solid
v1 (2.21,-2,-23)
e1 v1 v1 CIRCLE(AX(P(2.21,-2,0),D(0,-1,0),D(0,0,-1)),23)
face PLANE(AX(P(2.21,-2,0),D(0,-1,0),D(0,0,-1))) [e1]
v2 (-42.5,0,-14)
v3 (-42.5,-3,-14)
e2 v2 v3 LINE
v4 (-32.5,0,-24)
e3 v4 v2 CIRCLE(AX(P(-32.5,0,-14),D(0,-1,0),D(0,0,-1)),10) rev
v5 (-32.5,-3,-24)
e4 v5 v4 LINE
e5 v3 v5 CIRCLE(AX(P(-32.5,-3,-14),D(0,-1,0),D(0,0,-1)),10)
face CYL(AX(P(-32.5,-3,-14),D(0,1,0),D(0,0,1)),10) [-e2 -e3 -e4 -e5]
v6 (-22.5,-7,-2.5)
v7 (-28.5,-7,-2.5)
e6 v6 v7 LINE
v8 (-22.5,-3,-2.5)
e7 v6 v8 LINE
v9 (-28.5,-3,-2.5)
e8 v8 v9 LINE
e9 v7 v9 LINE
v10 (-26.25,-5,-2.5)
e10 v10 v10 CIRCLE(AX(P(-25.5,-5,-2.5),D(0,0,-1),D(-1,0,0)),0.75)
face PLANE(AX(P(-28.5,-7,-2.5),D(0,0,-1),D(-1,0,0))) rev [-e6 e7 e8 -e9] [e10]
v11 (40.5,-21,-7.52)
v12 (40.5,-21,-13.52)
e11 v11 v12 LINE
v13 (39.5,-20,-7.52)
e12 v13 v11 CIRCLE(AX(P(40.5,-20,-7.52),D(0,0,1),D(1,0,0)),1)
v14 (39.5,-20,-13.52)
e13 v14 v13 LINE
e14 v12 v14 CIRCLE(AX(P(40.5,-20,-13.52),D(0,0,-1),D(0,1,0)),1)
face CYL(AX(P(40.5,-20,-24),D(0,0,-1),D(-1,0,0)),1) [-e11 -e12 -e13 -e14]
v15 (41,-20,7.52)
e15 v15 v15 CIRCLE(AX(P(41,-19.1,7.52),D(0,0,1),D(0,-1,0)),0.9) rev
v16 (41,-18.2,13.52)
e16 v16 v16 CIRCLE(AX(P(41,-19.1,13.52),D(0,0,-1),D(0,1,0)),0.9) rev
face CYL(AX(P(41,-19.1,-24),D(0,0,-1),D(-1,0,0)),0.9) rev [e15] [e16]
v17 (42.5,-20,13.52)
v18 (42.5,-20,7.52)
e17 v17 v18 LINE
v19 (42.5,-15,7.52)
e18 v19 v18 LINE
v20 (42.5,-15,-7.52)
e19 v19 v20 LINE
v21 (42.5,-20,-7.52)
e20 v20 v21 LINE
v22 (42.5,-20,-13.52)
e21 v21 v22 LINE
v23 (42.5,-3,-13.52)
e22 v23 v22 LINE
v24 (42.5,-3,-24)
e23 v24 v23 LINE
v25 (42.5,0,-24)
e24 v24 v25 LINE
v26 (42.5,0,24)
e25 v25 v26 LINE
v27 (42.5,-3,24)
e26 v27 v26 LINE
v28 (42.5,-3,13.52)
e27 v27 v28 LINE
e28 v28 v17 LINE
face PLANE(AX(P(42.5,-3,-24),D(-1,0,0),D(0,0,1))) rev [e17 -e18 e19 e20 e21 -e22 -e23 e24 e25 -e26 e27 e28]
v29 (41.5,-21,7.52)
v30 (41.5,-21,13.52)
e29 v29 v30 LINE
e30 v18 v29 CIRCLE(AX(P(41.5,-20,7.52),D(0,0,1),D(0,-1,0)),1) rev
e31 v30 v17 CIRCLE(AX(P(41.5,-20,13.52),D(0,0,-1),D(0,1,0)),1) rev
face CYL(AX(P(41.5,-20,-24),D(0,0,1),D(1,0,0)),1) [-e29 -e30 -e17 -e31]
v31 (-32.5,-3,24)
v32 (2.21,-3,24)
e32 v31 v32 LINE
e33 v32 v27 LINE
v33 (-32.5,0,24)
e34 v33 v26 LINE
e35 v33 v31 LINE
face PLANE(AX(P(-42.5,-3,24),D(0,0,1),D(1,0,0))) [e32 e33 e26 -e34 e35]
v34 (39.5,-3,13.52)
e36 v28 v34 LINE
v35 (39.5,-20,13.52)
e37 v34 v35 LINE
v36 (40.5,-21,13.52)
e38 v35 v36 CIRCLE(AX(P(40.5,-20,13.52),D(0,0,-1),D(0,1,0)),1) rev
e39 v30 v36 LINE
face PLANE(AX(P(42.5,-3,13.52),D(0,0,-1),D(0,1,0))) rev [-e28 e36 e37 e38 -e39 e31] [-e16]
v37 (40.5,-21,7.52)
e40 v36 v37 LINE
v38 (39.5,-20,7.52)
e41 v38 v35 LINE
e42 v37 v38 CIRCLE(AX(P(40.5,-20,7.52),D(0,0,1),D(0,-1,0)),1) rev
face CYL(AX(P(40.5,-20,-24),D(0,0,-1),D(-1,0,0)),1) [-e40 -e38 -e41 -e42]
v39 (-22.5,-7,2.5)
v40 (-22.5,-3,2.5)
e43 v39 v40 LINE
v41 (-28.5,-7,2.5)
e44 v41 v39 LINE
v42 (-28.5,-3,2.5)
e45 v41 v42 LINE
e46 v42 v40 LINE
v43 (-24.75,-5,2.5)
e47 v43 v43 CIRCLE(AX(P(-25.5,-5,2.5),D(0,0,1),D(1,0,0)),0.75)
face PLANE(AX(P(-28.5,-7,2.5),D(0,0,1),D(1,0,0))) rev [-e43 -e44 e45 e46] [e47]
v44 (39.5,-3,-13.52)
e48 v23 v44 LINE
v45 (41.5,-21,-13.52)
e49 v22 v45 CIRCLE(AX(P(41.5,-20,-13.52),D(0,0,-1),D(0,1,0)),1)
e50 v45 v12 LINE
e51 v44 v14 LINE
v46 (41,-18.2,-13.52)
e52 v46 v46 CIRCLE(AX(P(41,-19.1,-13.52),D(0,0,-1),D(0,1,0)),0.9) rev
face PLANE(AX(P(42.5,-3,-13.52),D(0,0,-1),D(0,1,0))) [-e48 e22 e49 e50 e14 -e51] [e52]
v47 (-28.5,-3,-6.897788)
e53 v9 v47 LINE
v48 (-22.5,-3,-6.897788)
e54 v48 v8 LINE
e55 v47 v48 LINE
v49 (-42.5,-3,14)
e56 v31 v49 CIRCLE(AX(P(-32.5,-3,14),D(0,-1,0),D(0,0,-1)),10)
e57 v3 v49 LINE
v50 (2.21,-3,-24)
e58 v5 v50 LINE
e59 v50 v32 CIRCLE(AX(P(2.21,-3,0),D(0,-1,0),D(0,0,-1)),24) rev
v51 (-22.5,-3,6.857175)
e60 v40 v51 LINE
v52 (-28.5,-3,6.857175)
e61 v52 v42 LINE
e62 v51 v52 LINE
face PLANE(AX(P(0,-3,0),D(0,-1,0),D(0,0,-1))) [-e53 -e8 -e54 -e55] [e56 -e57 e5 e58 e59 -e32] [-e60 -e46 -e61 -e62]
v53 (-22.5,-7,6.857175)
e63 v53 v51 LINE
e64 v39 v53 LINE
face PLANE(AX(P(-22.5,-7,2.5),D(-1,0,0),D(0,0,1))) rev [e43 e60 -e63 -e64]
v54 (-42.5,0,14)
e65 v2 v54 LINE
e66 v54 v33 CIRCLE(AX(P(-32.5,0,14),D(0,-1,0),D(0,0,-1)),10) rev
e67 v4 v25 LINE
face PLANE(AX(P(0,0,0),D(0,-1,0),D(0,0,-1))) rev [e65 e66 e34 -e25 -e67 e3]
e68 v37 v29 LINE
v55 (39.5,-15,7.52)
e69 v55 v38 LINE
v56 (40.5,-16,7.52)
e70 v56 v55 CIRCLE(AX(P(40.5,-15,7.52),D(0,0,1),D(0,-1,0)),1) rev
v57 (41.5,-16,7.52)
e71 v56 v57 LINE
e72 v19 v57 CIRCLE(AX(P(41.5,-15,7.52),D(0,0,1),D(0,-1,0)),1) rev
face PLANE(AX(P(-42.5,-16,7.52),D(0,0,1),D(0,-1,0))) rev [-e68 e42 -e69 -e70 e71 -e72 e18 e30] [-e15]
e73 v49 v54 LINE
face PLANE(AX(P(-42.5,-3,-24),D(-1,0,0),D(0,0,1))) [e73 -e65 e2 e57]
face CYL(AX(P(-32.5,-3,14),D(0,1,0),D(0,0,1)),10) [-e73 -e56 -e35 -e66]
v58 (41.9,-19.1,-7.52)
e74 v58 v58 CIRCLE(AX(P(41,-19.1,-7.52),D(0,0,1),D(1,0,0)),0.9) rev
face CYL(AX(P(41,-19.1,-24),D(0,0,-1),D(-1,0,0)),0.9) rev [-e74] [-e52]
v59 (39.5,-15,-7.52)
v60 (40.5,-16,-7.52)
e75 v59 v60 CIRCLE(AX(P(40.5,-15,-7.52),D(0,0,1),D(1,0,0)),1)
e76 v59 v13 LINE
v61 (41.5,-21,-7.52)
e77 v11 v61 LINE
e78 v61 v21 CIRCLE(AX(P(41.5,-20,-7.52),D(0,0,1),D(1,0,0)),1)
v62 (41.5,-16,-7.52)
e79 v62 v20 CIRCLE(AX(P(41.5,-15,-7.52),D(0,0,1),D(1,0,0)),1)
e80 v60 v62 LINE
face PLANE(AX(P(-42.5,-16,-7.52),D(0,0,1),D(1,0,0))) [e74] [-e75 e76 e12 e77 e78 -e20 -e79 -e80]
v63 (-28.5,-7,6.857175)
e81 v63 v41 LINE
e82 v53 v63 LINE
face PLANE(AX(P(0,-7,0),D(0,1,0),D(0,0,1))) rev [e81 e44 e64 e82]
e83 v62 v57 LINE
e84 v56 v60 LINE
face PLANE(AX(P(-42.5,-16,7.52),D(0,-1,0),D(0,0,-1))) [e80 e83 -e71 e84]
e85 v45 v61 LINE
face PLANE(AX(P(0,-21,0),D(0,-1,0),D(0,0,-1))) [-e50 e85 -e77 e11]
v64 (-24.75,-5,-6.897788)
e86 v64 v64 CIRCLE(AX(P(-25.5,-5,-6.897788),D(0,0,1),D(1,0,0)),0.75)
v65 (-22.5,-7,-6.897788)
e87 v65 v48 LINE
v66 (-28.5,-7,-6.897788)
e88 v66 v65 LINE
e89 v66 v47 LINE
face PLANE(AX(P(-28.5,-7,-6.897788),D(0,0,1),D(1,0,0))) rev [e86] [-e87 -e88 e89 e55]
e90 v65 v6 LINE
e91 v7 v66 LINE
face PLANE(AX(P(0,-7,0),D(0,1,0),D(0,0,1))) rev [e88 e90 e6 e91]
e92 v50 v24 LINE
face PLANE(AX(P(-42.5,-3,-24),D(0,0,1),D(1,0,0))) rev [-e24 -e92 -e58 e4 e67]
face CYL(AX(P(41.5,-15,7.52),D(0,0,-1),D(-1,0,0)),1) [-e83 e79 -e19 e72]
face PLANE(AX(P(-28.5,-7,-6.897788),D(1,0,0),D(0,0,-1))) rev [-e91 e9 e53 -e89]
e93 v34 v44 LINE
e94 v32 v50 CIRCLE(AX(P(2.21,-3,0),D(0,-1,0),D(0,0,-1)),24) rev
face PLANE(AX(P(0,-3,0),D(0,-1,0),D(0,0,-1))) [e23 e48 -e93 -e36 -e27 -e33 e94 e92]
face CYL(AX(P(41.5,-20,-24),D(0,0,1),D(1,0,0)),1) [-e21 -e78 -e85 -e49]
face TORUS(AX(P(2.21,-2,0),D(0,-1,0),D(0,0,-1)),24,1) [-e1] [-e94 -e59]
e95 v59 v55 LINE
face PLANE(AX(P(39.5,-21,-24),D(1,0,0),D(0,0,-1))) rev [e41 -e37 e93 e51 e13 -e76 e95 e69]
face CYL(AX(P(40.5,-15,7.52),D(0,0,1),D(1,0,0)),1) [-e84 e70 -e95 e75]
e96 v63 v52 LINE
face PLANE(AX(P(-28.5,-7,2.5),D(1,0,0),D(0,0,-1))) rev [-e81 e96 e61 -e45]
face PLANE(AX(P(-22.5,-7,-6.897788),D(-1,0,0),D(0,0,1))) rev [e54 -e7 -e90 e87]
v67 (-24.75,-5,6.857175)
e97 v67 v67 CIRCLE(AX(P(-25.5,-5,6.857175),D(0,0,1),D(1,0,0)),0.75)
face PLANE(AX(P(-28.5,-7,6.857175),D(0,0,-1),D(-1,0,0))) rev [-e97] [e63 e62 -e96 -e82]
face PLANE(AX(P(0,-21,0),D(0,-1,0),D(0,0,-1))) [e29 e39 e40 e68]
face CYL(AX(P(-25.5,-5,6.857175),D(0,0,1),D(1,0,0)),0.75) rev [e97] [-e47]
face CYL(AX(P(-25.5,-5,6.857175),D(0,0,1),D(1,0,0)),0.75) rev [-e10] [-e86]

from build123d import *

# Parameters (mm, degrees)
SKETCH1_W                  = 85
SKETCH1_H                  = 48
BOSS_EXTRUDE1_DEPTH        = 3
SKETCH2_W                  = 3
SKETCH2_H                  = 48
BOSS_EXTRUDE2_DEPTH        = 18
M1_6_CLEARANCE_HOLE2_D     = 1.8
SKETCH11_W                 = 15.04
SKETCH11_H                 = 5
CUT_EXTRUDE5_DEPTH         = 91.785461391
SKETCH14_W                 = 10.48
SKETCH14_H                 = 18
CUT_EXTRUDE6_DEPTH         = 88.982952894
FILLET1_R                  = 1
FILLET2_R                  = 1
FILLET3_R                  = 1
FILLET4_R                  = 1
FILLET5_R                  = 1
FILLET6_R                  = 1
SKETCH17_R                 = 23
CUT_EXTRUDE11_DEPTH        = 1
FILLET9_R                  = 1
FILLET10_R                 = 10
FILLET11_R                 = 10
SKETCH18_W                 = 6
SKETCH18_H                 = 4.397787755
SKETCH18_H_2               = 4.357175314
BOSS_EXTRUDE3_DEPTH        = 4
F_1_5_1_5_DIAMETER_HOLE1_D = 1.5


with BuildPart() as part:
    # Sketch1 → Boss-Extrude1 (new body)
    with BuildSketch(Plane(origin=(0, 0, 0), x_dir=(1, 0, 0), z_dir=(0, 1, 0))):
        Rectangle(SKETCH1_W, SKETCH1_H)
    extrude(amount=-BOSS_EXTRUDE1_DEPTH)

    # Sketch2 → Boss-Extrude2 (add)
    with BuildSketch(Plane.XZ.offset(3)):
        with Locations((41, 0)):
            Rectangle(SKETCH2_W, SKETCH2_H)
    extrude(amount=BOSS_EXTRUDE2_DEPTH)

    # M1.6 Clearance Hole2 (through all)
    with Locations(Plane(origin=(0, 0, -24), x_dir=(-1, 0, 0), z_dir=(0, 0, -1))):
        with Locations((-41, -19.1)):
            Hole(M1_6_CLEARANCE_HOLE2_D / 2)

    # Sketch11 → Cut-Extrude5 (cut, through all)
    with BuildSketch(Plane(origin=(42.5, 0, 0), x_dir=(0, 0, -1), z_dir=(1, 0, 0))):
        with Locations((0, -18.5)):
            Rectangle(SKETCH11_W, SKETCH11_H)
    extrude(amount=-CUT_EXTRUDE5_DEPTH, mode=Mode.SUBTRACT)

    # Sketch14 → Cut-Extrude6 (cut, through all)
    with BuildSketch(Plane.ZY.offset(-39.5)):
        with Locations((-18.76, -12)):
            Rectangle(SKETCH14_W, SKETCH14_H)
        with Locations((18.76, -12)):
            Rectangle(SKETCH14_W, SKETCH14_H)
    extrude(amount=-CUT_EXTRUDE6_DEPTH, mode=Mode.SUBTRACT)

    # Fillet1
    fillet1_edges = [part.edges().sort_by_distance(p)[0] for p in [
        (42.5, -21, -10.52),
    ]]
    fillet(fillet1_edges, radius=FILLET1_R)

    # Fillet2
    fillet2_edges = [part.edges().sort_by_distance(p)[0] for p in [
        (42.5, -21, 10.52),
    ]]
    fillet(fillet2_edges, radius=FILLET2_R)

    # Fillet3
    fillet3_edges = [part.edges().sort_by_distance(p)[0] for p in [
        (39.5, -21, -10.52),
    ]]
    fillet(fillet3_edges, radius=FILLET3_R)

    # Fillet4
    fillet4_edges = [part.edges().sort_by_distance(p)[0] for p in [
        (39.5, -21, 10.52),
    ]]
    fillet(fillet4_edges, radius=FILLET4_R)

    # Fillet5
    fillet5_edges = [part.edges().sort_by_distance(p)[0] for p in [
        (42.5, -16, 0),
    ]]
    fillet(fillet5_edges, radius=FILLET5_R)

    # Fillet6
    fillet6_edges = [part.edges().sort_by_distance(p)[0] for p in [
        (39.5, -16, 0),
    ]]
    fillet(fillet6_edges, radius=FILLET6_R)

    # Sketch17 → Cut-Extrude11 (cut)
    with BuildSketch(Plane.XZ.offset(3)):
        with Locations(Location((2.21, 0, 0), (0, 0, 270))):
            Circle(SKETCH17_R)
    extrude(amount=-CUT_EXTRUDE11_DEPTH, mode=Mode.SUBTRACT)

    # Fillet9
    fillet9_edges = [part.edges().sort_by_distance(p)[0] for p in [
        (2.21, -3, 23),
    ]]
    fillet(fillet9_edges, radius=FILLET9_R - 0.0001)  # a hair under: the kernel refuses the full size

    # Fillet10
    fillet10_edges = [part.edges().sort_by_distance(p)[0] for p in [
        (-42.5, -1.5, -24),
    ]]
    fillet(fillet10_edges, radius=FILLET10_R)

    # Fillet11
    fillet11_edges = [part.edges().sort_by_distance(p)[0] for p in [
        (-42.5, -1.5, 24),
    ]]
    fillet(fillet11_edges, radius=FILLET11_R)

    # Sketch18 → Boss-Extrude3 (add)
    with BuildSketch(Plane.XZ.offset(3)):
        with Locations((-25.5, -4.698893877)):
            Rectangle(SKETCH18_W, SKETCH18_H)
        with Locations((-25.5, 4.678587657)):
            Rectangle(SKETCH18_W, SKETCH18_H_2)
    extrude(amount=BOSS_EXTRUDE3_DEPTH)

    # Ø1.5 (1.5) Diameter Hole1 (through all)
    with Locations(Plane.XY.offset(6.857175314)):
        with Locations((-25.5, -5)):
            Hole(F_1_5_1_5_DIAMETER_HOLE1_D / 2)


solid = part.part
